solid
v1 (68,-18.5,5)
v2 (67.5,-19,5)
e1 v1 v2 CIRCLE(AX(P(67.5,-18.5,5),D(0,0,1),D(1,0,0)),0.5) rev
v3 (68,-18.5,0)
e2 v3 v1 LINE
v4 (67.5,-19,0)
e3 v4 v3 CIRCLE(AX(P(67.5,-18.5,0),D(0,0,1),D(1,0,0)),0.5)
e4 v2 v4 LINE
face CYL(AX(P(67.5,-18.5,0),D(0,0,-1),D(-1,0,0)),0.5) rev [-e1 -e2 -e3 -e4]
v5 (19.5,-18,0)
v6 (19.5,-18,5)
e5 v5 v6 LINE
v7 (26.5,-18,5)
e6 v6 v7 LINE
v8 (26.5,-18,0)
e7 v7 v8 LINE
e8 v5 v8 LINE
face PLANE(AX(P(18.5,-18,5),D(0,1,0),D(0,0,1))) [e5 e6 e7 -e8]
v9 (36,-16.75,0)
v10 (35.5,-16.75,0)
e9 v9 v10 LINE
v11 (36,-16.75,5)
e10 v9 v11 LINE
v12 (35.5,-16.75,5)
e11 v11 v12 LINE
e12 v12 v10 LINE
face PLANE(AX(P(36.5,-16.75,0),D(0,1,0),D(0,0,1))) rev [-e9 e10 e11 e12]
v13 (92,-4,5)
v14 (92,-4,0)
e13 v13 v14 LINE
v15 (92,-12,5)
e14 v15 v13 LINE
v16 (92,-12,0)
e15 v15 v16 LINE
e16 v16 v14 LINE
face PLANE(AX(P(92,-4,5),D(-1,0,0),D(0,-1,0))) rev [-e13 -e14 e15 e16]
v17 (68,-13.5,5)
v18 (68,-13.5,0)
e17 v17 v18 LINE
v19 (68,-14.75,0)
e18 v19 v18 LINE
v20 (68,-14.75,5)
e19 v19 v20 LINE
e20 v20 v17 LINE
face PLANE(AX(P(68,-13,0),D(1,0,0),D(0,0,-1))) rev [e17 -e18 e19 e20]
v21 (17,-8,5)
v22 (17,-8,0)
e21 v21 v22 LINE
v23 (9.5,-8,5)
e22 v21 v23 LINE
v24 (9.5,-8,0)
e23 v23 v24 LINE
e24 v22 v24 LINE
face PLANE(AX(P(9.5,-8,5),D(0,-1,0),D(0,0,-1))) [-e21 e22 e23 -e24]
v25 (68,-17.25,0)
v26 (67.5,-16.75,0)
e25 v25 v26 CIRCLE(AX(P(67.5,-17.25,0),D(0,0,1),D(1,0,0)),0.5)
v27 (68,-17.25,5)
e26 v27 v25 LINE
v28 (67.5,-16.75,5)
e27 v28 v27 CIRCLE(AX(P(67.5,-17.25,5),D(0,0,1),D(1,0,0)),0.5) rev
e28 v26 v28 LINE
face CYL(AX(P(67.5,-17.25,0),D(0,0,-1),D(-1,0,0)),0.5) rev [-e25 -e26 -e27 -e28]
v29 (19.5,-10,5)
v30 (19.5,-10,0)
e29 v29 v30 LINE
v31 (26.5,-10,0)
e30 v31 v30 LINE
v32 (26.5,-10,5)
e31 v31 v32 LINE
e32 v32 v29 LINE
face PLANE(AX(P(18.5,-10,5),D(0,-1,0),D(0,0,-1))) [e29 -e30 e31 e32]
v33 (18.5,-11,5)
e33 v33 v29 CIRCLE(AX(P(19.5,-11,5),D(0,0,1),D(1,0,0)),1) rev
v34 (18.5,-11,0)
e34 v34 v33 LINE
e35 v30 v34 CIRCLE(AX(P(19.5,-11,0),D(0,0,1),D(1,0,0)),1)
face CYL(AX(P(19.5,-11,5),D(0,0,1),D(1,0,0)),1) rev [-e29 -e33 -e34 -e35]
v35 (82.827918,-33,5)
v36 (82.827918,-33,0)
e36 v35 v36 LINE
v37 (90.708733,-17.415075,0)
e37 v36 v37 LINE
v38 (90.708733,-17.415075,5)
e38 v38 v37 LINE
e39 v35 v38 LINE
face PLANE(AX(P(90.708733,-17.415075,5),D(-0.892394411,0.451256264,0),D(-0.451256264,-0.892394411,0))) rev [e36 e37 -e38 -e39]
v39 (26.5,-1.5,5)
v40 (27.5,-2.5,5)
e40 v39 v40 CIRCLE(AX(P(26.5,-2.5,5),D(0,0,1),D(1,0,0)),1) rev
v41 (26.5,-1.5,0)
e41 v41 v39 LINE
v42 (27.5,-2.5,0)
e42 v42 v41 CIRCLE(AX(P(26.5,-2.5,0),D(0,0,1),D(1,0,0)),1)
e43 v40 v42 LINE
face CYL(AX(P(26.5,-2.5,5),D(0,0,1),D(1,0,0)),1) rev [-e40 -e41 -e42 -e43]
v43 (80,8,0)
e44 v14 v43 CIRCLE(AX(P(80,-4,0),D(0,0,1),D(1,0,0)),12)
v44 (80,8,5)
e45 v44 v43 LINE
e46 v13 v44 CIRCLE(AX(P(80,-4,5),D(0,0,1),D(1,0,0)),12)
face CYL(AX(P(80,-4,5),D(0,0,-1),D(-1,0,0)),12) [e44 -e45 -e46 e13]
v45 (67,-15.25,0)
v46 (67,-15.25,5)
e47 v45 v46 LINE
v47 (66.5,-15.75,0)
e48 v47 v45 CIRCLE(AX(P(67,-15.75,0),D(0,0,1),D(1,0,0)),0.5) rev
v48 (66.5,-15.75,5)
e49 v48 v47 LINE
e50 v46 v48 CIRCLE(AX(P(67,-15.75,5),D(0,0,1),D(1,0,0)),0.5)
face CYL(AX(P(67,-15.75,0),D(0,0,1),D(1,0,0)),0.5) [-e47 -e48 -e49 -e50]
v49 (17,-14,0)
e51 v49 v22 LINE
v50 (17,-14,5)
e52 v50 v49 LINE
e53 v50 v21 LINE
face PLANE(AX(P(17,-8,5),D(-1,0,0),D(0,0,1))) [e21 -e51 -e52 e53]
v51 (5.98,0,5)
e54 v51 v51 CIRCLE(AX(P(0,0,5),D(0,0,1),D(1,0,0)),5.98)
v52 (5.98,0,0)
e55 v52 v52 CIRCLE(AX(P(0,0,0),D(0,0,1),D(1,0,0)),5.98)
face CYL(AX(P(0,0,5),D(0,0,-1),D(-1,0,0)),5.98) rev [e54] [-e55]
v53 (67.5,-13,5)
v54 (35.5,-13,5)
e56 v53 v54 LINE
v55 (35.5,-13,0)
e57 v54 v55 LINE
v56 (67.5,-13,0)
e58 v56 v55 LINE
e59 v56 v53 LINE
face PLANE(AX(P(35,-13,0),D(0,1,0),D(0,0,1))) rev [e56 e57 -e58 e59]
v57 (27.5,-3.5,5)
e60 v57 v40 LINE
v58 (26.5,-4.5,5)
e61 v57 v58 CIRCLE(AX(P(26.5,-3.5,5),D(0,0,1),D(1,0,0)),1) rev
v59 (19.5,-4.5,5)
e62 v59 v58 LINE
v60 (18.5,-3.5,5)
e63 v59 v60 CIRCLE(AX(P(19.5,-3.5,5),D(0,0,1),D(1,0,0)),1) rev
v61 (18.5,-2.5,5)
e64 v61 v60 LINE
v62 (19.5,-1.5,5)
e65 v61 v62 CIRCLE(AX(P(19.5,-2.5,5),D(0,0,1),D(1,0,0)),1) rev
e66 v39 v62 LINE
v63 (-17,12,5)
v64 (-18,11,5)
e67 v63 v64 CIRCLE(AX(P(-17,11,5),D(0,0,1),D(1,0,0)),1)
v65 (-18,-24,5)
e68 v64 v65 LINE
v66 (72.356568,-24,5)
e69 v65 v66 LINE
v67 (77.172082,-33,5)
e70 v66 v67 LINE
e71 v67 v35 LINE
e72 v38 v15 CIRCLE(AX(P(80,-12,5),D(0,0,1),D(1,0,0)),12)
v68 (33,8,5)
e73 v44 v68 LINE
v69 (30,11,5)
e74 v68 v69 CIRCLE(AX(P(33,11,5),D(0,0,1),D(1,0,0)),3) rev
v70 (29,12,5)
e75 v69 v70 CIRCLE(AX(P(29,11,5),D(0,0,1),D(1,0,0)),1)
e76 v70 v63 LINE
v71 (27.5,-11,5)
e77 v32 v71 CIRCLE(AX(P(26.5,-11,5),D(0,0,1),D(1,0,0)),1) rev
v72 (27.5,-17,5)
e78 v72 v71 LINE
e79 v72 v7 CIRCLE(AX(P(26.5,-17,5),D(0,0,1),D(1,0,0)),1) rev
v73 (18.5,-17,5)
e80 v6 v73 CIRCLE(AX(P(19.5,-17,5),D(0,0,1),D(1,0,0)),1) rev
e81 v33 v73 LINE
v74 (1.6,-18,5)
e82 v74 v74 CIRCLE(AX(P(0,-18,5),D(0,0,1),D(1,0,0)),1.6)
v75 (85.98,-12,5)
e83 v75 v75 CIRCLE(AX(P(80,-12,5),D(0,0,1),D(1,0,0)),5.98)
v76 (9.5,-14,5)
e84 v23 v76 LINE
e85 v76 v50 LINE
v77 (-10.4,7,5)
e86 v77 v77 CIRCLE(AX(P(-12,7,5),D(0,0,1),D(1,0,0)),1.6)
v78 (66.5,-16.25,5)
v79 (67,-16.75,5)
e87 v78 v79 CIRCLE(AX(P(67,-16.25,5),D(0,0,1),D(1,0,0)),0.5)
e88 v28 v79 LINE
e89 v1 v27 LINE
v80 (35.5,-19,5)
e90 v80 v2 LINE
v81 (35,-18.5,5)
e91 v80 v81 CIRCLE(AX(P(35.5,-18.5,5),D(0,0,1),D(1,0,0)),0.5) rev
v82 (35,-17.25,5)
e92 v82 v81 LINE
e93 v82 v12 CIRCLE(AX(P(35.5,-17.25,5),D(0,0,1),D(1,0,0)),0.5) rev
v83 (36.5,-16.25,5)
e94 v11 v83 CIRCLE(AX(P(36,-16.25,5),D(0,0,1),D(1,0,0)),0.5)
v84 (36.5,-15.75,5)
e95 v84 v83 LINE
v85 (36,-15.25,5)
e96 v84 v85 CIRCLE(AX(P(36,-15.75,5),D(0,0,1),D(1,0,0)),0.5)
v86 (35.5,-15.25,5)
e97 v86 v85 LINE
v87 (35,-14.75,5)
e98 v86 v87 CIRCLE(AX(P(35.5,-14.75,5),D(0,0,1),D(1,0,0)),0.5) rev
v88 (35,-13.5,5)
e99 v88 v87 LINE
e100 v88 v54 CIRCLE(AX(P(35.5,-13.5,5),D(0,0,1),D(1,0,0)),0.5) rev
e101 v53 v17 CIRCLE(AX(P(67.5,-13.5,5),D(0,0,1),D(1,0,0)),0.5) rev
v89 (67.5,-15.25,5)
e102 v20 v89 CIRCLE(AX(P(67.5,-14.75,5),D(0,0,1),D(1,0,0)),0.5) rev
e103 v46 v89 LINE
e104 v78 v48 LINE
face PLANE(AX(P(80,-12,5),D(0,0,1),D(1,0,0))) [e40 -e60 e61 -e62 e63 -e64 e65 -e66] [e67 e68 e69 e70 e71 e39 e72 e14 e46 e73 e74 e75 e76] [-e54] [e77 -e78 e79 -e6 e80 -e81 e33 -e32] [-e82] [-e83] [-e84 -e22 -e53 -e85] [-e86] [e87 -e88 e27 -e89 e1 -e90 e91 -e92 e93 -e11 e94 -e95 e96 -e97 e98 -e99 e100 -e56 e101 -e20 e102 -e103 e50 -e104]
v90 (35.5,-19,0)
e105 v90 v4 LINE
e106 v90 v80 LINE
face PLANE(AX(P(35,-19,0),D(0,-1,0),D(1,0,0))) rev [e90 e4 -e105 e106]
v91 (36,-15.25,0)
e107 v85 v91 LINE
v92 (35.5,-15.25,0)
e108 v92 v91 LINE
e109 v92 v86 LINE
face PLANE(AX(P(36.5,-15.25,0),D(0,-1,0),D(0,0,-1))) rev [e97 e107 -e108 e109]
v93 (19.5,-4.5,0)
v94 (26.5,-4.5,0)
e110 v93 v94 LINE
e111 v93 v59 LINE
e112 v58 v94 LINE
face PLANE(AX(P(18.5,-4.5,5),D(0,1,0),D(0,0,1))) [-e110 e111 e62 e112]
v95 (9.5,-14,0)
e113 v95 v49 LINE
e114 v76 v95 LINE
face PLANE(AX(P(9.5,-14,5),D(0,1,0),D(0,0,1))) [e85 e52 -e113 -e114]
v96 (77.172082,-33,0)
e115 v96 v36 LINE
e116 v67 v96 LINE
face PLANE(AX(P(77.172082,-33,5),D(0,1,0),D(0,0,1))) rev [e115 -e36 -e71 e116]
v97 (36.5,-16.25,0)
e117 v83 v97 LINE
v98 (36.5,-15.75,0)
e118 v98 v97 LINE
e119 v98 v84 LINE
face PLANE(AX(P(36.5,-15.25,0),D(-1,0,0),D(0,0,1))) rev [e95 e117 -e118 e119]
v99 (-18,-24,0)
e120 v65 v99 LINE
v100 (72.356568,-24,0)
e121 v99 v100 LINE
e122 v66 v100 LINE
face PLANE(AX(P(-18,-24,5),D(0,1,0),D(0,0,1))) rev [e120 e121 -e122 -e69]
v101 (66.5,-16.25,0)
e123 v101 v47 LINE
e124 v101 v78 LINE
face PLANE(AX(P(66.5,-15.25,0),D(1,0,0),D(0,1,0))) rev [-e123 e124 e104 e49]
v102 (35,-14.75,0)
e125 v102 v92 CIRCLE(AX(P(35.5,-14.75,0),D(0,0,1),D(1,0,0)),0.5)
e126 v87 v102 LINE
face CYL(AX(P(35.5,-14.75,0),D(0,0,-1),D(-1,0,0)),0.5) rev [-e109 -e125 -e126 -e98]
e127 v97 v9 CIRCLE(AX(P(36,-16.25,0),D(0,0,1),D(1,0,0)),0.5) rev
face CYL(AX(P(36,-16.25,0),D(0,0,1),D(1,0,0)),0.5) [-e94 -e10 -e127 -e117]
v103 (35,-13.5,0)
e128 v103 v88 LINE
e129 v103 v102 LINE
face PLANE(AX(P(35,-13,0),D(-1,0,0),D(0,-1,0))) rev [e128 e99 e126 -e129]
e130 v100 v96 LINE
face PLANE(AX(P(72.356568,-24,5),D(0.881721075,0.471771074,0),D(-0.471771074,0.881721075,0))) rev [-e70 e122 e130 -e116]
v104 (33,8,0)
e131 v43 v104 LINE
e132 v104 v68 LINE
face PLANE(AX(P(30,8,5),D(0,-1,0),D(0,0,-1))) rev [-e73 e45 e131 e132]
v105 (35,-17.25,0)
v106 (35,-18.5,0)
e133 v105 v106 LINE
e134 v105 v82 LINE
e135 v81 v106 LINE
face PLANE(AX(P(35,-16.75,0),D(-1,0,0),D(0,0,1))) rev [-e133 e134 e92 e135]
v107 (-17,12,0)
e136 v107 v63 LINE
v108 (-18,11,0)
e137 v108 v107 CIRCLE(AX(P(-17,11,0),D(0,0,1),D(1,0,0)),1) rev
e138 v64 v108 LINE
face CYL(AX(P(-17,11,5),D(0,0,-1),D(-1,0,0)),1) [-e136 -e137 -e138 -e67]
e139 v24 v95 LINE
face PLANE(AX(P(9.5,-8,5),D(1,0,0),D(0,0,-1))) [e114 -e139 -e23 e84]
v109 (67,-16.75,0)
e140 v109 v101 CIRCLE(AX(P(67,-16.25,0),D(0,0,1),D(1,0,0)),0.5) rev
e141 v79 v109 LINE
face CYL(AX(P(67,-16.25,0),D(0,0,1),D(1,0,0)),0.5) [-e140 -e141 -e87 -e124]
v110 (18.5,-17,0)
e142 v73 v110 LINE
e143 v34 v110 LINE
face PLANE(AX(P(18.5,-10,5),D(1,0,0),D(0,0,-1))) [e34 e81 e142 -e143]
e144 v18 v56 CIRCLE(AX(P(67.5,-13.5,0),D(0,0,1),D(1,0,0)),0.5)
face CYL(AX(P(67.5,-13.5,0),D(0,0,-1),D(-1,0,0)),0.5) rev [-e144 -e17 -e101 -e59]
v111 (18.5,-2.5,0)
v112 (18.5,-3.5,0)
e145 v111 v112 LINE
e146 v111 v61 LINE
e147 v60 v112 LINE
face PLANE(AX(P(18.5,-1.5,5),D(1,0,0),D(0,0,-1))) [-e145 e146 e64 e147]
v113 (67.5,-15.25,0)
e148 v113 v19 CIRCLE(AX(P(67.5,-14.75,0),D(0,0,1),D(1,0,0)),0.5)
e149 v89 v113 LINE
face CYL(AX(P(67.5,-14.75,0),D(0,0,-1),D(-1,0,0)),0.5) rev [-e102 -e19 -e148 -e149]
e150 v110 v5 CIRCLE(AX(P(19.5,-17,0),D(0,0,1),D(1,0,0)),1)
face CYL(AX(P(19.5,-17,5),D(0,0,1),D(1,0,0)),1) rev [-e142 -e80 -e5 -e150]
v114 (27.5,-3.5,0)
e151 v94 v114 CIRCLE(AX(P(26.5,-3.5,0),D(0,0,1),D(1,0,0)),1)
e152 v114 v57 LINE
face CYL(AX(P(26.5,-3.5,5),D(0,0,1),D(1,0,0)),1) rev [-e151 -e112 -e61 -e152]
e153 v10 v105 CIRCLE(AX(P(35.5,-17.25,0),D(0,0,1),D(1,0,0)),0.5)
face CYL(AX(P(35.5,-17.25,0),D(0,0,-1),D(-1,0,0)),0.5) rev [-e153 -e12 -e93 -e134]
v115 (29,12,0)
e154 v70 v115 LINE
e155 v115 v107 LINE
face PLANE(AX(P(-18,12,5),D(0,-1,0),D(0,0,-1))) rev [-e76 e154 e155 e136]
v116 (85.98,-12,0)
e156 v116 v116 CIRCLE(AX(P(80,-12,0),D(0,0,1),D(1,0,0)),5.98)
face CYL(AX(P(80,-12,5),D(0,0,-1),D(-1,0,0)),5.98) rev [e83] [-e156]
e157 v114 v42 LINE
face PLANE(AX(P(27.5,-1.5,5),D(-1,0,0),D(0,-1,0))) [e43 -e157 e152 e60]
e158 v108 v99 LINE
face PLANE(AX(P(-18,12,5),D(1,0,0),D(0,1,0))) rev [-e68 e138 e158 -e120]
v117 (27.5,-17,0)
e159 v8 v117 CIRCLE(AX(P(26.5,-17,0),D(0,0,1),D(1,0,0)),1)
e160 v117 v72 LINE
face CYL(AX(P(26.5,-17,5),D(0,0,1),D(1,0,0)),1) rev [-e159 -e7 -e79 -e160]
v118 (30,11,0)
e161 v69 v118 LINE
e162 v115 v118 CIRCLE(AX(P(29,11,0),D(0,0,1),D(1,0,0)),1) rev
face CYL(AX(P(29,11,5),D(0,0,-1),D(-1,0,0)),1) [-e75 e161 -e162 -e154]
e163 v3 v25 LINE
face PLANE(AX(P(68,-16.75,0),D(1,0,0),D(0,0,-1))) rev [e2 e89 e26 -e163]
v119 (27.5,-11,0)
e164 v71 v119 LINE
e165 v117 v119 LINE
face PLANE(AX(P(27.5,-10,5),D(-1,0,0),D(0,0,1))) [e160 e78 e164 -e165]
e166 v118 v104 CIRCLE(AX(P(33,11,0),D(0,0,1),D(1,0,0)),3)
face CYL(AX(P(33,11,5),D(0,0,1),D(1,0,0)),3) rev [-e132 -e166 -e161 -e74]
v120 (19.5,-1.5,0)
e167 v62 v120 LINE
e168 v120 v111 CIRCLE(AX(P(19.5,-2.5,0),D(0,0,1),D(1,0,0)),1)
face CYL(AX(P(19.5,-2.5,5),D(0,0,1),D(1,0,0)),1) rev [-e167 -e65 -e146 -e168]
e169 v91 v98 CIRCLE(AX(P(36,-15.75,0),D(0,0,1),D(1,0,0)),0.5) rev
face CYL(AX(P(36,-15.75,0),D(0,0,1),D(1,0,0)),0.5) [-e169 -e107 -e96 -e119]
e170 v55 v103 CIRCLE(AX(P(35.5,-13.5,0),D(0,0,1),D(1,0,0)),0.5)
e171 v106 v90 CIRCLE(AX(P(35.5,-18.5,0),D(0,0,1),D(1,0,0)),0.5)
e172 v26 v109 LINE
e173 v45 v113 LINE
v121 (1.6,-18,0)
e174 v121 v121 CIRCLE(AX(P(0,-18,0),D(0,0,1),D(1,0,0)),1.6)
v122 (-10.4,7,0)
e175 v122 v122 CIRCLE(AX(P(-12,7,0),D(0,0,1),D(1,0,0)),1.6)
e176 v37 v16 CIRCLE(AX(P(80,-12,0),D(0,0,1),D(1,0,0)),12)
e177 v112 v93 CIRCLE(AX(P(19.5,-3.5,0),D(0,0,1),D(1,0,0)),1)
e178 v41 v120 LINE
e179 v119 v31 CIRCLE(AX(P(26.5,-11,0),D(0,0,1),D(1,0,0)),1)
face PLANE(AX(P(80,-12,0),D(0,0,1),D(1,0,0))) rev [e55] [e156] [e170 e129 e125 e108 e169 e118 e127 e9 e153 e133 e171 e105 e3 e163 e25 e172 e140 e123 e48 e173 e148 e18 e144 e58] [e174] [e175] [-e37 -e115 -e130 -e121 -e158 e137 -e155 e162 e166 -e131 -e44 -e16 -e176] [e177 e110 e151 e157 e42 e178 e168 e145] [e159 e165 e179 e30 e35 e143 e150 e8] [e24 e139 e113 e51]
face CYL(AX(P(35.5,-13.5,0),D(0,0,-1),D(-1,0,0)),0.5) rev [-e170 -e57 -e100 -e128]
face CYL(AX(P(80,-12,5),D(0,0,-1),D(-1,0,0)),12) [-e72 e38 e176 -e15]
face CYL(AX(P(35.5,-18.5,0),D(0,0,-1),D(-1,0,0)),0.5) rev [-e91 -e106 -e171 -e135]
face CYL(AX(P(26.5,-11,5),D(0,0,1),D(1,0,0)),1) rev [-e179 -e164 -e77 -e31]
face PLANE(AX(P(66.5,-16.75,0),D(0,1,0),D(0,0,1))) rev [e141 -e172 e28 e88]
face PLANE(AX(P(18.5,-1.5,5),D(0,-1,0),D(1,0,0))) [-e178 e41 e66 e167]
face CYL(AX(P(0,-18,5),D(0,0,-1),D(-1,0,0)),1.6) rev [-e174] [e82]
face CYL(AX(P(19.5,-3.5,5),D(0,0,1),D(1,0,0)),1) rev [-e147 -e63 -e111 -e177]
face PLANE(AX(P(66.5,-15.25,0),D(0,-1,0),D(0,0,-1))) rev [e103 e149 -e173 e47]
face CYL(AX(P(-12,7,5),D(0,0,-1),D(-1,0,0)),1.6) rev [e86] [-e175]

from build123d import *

# Parameters (mm, degrees)
SKETCH1_R           = 5.98
SKETCH1_R_2         = 1.6
SKETCH1_W           = 9
SKETCH1_H           = 8
SKETCH1_H_2         = 3
SKETCH1_W_2         = 7.5
SKETCH1_H_3         = 6
BOSS_EXTRUDE1_DEPTH = 5
FILLET1_R           = 1
FILLET2_R           = 3
FILLET3_R           = 1
CUT_EXTRUDE1_DEPTH  = 98.867257037
FILLET4_R           = 0.5


with BuildPart() as part:
    # Sketch1 → Boss-Extrude1 (new body)
    with BuildSketch(Plane.XY):
        with BuildLine():
            Line((72.356568311, -24), (77.172081726, -33))
            Line((77.172081726, -33), (82.827918274, -33))
            Line((82.827918274, -33), (90.70873293, -17.415075165))
            ThreePointArc((90.70873293, -17.415075165), (91.67272023, -14.78345153), (92, -12))
            Line((92, -12), (92, -4))
            ThreePointArc((92, -4), (88.485281374, 4.485281374), (80, 8))
            Line((80, 8), (30, 8))
            Line((30, 8), (30, 12))
            Line((30, 12), (-18, 12))
            Line((-18, 12), (-18, -24))
            Line((-18, -24), (72.356568311, -24))
        make_face()
        Circle(SKETCH1_R, mode=Mode.SUBTRACT)
        with Locations((80, -12)):
            Circle(SKETCH1_R, mode=Mode.SUBTRACT)
        with Locations((-12, 7)):
            Circle(SKETCH1_R_2, mode=Mode.SUBTRACT)
        with Locations((0, -18)):
            Circle(SKETCH1_R_2, mode=Mode.SUBTRACT)
        with Locations((23, -14)):
            Rectangle(SKETCH1_W, SKETCH1_H, mode=Mode.SUBTRACT)
        with Locations((23, -3)):
            Rectangle(SKETCH1_W, SKETCH1_H_2, mode=Mode.SUBTRACT)
        with Locations((13.25, -11)):
            Rectangle(SKETCH1_W_2, SKETCH1_H_3, mode=Mode.SUBTRACT)
    extrude(amount=BOSS_EXTRUDE1_DEPTH)

    # Fillet1
    fillet1_edges = [part.edges().sort_by_distance(p)[0] for p in [
        (18.5, -10, 2.5),
        (18.5, -18, 2.5),
        (27.5, -18, 2.5),
        (27.5, -10, 2.5),
        (18.5, -1.5, 2.5),
        (18.5, -4.5, 2.5),
        (27.5, -4.5, 2.5),
        (27.5, -1.5, 2.5),
    ]]
    fillet(fillet1_edges, radius=FILLET1_R)

    # Fillet2
    fillet2_edges = [part.edges().sort_by_distance(p)[0] for p in [
        (30, 8, 2.5),
    ]]
    fillet(fillet2_edges, radius=FILLET2_R)

    # Fillet3
    fillet3_edges = [part.edges().sort_by_distance(p)[0] for p in [
        (30, 12, 2.5),
        (-18, 12, 2.5),
    ]]
    fillet(fillet3_edges, radius=FILLET3_R - 0.0001)  # a hair under: the kernel refuses the full size

    # Sketch2 → Cut-Extrude1 (cut, through all)
    with BuildSketch(Plane.XY.offset(5)):
        Polygon((35, -13), (68, -13), (68, -15.25), (66.5, -15.25), (66.5, -16.75), (68, -16.75), (68, -19), (35, -19), (35, -16.75), (36.5, -16.75), (36.5, -15.25), (35, -15.25), align=None)
    extrude(amount=-CUT_EXTRUDE1_DEPTH, mode=Mode.SUBTRACT)

    # Fillet4
    fillet4_edges = [part.edges().sort_by_distance(p)[0] for p in [
        (35, -15.25, 2.5),
        (35, -13, 2.5),
        (68, -13, 2.5),
        (68, -15.25, 2.5),
        (66.5, -15.25, 2.5),
        (66.5, -16.75, 2.5),
        (68, -16.75, 2.5),
        (68, -19, 2.5),
        (35, -19, 2.5),
        (35, -16.75, 2.5),
        (36.5, -16.75, 2.5),
        (36.5, -15.25, 2.5),
    ]]
    fillet(fillet4_edges, radius=FILLET4_R)


solid = part.part
